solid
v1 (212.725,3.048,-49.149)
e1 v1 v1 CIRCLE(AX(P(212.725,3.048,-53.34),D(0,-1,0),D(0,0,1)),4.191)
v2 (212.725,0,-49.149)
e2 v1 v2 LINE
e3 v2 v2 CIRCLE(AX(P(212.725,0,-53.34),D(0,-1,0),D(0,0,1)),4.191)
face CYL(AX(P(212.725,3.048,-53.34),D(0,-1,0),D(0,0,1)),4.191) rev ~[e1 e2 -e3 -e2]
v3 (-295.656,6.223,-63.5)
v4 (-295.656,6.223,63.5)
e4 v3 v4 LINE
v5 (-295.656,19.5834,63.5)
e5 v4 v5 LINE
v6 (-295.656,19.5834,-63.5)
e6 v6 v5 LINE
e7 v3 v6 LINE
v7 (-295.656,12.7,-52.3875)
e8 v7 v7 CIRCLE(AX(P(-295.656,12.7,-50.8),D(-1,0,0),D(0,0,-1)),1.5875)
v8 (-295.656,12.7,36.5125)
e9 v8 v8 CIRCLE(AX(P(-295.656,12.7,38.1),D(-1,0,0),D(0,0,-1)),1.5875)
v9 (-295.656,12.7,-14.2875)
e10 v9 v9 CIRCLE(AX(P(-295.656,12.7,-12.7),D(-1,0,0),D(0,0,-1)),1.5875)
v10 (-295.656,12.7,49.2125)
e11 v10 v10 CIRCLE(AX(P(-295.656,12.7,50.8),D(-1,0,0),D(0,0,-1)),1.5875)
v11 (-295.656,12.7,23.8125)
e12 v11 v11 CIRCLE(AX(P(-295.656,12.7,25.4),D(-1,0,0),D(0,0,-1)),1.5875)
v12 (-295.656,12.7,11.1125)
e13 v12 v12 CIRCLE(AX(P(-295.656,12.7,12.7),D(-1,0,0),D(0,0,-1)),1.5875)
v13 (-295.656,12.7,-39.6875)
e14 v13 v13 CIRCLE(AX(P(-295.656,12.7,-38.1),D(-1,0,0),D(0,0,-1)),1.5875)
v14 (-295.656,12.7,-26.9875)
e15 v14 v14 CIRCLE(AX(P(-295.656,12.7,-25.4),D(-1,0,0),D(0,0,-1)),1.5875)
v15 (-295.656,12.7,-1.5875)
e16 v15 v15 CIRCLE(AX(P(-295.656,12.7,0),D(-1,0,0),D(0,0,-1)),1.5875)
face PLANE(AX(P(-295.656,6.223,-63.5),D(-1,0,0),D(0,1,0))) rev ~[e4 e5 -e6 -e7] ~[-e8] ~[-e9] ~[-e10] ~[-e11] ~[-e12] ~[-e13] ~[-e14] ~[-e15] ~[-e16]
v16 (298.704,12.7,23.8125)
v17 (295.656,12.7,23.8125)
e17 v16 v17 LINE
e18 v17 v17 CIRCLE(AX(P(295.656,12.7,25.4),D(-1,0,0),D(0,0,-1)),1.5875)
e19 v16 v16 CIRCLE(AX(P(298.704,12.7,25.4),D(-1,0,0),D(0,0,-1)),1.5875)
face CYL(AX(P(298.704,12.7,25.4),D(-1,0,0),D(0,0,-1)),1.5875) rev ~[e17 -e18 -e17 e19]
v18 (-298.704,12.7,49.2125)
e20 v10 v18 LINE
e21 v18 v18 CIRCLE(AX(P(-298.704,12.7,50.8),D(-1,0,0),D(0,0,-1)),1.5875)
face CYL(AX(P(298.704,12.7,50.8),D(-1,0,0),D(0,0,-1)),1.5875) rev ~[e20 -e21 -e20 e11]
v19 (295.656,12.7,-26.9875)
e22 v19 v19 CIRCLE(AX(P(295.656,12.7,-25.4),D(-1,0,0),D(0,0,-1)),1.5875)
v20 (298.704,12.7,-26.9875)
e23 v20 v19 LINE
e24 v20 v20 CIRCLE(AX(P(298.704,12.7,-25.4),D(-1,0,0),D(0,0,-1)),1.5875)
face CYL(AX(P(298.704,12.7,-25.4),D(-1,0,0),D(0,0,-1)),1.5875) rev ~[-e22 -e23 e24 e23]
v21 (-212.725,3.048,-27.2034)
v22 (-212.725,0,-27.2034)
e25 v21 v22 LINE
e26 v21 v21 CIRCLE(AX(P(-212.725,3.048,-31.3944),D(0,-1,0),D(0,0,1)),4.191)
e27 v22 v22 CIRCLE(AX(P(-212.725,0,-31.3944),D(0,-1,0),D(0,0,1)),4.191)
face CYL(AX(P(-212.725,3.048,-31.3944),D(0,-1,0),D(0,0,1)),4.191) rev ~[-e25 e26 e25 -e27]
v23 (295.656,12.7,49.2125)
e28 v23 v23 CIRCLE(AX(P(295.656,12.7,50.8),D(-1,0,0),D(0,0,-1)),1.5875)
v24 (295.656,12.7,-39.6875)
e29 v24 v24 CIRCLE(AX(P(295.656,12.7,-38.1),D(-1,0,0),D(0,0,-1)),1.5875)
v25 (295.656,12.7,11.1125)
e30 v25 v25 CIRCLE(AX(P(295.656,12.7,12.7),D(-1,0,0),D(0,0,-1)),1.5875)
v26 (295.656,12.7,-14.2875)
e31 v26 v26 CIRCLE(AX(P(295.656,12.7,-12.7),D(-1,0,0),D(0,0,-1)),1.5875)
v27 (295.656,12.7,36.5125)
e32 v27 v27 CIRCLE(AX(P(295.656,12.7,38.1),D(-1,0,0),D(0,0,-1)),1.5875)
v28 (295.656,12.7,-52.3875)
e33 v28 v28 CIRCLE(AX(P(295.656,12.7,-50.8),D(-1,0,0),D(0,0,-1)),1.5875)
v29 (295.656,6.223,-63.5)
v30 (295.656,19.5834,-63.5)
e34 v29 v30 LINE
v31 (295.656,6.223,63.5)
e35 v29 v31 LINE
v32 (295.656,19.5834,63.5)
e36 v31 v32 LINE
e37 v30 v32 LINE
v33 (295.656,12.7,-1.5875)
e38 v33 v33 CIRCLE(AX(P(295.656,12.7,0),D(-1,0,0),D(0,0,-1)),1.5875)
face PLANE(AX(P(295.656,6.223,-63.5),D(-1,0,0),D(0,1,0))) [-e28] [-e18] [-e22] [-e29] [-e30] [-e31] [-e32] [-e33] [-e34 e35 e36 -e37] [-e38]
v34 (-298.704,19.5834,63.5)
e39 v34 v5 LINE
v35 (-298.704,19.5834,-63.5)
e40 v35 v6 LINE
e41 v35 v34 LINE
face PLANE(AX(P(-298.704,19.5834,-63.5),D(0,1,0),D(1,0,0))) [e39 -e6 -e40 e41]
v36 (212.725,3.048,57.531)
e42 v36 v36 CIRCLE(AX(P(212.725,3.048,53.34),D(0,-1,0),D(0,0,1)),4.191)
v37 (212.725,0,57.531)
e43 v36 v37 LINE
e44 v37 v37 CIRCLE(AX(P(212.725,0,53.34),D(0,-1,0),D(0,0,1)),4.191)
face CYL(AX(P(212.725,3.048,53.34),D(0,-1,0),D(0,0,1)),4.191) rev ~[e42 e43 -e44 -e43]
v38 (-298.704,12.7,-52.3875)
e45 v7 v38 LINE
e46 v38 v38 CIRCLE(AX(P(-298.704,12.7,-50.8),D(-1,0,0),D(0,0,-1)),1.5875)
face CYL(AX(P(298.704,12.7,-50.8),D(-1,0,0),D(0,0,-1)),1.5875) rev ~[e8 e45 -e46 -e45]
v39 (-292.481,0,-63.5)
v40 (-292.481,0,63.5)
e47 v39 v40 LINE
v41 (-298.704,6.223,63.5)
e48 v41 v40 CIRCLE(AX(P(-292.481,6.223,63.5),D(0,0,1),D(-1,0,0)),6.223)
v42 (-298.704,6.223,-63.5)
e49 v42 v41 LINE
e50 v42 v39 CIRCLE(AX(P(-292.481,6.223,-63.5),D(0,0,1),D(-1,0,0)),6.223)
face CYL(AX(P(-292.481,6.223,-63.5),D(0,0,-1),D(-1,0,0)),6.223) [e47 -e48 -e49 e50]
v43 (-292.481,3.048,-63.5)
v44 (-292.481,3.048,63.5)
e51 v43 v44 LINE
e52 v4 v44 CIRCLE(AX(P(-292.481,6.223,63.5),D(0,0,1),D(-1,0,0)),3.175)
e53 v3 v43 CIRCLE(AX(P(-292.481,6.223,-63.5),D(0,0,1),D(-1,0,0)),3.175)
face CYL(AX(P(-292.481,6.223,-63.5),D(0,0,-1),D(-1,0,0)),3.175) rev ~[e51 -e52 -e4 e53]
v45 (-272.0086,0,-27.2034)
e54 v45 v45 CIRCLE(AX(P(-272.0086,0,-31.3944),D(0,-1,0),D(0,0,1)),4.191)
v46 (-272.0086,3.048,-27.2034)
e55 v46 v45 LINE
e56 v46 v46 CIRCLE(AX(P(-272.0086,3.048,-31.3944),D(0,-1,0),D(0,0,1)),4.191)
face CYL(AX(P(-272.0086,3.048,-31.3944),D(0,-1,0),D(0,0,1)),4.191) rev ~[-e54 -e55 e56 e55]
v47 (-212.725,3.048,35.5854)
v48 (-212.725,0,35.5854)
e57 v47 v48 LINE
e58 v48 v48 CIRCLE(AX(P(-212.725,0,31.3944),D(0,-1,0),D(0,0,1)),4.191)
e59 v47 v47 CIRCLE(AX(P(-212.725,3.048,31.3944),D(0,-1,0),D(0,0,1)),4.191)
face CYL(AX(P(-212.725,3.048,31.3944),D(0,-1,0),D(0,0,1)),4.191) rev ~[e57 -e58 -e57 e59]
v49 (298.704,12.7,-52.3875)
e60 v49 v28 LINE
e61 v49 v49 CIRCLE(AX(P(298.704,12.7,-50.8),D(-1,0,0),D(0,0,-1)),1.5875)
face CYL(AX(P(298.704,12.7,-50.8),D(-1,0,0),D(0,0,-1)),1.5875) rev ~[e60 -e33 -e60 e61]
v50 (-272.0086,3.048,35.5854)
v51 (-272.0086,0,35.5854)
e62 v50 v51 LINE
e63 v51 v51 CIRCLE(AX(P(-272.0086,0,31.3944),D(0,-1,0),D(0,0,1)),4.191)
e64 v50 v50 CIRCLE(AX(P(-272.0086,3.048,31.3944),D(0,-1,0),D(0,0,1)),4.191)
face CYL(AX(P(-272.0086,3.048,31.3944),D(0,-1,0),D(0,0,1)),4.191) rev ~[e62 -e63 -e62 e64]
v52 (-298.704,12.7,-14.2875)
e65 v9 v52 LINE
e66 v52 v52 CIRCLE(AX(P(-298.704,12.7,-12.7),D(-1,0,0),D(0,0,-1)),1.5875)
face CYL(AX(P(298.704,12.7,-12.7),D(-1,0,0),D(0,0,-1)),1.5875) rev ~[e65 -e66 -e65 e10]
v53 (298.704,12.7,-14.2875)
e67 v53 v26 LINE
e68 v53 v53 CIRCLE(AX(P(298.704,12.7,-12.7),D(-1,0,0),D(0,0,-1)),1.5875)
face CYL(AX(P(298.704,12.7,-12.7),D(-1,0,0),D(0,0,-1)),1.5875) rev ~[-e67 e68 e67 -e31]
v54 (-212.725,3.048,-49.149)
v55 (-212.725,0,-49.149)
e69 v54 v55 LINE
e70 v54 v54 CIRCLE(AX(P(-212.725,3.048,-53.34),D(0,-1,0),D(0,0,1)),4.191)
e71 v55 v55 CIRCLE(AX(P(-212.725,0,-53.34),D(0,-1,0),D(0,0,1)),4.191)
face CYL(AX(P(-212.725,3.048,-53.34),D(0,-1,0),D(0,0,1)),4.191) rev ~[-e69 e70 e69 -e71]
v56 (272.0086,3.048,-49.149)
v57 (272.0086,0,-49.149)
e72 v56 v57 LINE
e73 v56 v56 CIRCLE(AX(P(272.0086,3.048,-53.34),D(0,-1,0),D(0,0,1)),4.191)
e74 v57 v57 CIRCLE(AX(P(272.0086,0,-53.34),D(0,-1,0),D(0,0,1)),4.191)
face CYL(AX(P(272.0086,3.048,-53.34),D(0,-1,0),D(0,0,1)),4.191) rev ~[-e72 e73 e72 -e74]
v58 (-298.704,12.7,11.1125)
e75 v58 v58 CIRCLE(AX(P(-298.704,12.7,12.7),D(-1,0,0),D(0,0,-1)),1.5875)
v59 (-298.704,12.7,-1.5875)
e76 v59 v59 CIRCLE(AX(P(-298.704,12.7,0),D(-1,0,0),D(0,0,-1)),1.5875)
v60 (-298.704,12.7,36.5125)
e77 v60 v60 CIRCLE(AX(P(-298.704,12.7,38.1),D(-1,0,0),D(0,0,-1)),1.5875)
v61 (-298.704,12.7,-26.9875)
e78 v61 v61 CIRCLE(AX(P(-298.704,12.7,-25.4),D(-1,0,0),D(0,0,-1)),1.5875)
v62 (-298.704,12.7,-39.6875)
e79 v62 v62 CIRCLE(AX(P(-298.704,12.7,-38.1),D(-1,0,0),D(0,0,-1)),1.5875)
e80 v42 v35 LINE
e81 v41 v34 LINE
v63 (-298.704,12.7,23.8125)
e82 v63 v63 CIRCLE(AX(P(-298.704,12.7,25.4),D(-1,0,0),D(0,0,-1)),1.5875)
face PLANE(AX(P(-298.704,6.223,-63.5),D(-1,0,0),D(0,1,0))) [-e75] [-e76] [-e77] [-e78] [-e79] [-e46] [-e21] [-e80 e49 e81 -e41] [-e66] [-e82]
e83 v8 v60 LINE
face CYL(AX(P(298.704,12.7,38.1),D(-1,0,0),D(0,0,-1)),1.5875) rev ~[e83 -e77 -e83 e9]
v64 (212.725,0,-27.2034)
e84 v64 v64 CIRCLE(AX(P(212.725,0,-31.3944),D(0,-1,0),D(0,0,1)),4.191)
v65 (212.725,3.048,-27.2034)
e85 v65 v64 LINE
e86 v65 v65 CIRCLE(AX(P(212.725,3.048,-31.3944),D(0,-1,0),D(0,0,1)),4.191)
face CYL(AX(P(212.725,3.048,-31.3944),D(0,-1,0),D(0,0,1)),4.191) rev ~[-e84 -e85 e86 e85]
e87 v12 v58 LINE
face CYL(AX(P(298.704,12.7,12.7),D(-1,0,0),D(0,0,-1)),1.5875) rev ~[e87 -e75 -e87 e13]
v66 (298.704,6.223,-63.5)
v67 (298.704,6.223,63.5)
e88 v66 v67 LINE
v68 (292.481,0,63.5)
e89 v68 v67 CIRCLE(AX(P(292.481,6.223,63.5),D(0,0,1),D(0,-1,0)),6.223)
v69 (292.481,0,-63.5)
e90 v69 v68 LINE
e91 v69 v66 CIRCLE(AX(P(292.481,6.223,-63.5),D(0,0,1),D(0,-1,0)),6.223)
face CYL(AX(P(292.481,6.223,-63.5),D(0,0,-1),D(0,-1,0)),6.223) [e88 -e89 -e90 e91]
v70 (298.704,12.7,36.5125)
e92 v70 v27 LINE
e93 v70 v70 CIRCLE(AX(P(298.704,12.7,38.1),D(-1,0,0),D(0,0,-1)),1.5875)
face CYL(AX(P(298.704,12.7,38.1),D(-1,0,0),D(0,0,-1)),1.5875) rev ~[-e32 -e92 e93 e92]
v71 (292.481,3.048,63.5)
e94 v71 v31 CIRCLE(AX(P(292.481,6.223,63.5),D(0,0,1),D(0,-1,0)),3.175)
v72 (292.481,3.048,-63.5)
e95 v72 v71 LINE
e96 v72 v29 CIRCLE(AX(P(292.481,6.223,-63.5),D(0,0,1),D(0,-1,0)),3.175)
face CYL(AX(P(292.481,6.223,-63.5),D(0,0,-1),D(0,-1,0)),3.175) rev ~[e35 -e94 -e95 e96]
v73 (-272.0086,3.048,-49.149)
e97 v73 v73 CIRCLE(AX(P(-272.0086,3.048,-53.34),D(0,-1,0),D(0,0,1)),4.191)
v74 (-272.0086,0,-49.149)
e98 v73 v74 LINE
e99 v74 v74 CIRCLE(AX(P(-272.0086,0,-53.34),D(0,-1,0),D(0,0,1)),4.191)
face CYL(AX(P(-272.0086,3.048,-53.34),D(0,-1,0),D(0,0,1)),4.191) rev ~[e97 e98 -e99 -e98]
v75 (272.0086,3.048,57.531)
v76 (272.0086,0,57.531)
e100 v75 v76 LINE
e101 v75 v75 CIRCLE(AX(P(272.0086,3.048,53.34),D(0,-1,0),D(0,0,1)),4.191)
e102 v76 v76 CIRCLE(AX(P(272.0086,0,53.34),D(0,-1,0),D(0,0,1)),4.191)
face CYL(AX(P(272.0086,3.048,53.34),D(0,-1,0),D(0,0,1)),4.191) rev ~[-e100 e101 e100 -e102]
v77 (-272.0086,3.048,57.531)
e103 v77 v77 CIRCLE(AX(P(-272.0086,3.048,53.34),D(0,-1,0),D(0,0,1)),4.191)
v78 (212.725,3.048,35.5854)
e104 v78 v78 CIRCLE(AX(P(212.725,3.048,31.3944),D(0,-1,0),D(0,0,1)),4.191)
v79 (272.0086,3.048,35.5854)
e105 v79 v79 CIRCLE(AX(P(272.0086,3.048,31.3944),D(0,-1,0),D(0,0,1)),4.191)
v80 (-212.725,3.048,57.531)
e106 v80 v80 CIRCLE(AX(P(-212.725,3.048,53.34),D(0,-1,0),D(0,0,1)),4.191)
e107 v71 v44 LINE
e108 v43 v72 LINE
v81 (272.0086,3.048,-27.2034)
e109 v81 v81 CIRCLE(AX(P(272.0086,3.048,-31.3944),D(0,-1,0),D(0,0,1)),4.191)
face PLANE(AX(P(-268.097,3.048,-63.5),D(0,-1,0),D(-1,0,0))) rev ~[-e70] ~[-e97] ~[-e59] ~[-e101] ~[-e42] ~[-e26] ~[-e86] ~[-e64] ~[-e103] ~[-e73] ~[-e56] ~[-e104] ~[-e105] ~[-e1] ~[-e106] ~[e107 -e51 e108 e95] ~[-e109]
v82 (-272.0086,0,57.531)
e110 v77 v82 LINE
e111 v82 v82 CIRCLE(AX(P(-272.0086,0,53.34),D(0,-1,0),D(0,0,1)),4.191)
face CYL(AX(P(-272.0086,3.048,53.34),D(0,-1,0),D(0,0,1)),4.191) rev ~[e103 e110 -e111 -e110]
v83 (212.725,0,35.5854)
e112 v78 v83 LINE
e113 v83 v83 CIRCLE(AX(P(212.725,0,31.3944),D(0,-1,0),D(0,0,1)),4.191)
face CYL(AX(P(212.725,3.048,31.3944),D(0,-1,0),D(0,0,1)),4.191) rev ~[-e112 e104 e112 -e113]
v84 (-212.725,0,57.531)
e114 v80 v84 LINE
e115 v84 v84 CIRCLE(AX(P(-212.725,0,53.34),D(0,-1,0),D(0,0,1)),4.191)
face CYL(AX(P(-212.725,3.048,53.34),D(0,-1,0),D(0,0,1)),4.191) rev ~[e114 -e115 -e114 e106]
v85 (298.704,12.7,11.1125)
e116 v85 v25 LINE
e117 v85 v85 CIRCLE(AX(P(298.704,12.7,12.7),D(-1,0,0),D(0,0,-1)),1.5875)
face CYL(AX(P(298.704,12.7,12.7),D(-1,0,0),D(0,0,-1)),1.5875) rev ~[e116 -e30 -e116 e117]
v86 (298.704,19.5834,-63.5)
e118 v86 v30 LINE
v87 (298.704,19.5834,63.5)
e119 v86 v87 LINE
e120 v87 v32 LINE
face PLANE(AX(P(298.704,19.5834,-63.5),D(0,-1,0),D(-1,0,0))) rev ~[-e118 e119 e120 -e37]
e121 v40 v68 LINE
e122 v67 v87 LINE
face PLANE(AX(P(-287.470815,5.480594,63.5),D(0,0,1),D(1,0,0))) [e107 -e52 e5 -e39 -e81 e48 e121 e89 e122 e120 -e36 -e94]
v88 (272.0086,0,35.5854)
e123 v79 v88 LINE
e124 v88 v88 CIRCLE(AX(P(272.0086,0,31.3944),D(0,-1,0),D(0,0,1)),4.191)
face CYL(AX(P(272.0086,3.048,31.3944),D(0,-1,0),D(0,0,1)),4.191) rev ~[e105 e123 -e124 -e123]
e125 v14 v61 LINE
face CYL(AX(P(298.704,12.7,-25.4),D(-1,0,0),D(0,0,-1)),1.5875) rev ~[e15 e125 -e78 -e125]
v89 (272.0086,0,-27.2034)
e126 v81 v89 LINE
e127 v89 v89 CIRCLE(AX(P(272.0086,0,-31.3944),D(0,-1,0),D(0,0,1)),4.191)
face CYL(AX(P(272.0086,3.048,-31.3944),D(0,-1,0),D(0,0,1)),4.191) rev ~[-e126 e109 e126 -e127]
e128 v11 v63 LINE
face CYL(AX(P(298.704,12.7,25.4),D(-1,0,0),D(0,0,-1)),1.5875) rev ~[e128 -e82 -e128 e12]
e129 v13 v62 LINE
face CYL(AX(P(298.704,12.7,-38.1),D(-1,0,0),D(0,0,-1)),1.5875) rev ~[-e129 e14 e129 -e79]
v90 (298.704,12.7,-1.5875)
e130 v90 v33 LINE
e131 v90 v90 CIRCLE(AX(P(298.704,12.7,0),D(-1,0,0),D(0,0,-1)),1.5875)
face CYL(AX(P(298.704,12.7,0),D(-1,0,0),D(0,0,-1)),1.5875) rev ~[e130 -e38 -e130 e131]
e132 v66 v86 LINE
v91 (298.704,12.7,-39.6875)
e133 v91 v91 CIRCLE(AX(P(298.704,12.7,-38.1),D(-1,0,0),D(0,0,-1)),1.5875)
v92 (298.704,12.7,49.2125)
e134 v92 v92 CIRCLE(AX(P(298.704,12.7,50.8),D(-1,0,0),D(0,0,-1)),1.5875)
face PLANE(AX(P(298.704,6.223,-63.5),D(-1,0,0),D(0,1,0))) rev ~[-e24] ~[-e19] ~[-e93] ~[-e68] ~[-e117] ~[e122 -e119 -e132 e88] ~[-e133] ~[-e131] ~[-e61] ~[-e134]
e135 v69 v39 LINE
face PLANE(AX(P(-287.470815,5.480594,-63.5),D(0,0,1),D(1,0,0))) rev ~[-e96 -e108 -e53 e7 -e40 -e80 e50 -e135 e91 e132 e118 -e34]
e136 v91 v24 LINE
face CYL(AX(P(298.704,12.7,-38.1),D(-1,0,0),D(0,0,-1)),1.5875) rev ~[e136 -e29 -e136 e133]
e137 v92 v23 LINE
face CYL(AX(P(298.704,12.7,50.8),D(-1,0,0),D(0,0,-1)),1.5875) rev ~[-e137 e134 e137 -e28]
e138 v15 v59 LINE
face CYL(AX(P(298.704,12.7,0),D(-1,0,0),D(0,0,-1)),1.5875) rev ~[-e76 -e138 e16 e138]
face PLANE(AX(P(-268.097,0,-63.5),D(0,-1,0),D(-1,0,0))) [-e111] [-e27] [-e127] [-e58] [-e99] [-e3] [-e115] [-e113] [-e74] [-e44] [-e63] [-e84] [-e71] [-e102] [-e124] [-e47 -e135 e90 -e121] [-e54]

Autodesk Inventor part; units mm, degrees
ref_plane "YZ Plane" through (0, 0, 0) normal (1, 0, 0) x (0, 1, 0)
ref_plane "XZ Plane" through (0, 0, 0) normal (0, 1, 0) x (-1, 0, 0)
ref_plane "XY Plane" through (0, 0, 0) normal (0, 0, 1) x (1, 0, 0)
sketch "Sketch2" plane through (0, 0, 0) normal (0, 1, 0) x (-1, 0, 0)
  line L0 (-292.481, 63.5) -> (292.481, 63.5)
  line L1 (292.481, 63.5) -> (292.481, -63.5)
  line L2 (292.481, -63.5) -> (-292.481, -63.5)
  line L3 (-292.481, -63.5) -> (-292.481, 63.5)
  point P0 (0, 0)
  dimension "d0" = 292.481
  dimension "d1" = 292.481
  dimension "d2" = 63.5
  dimension "d3" = 63.5
extrude "Plate1" add sketch "Sketch2" along normal blind 3.048
sketch "Sketch3" plane through (-292.481, 0, 63.5) normal (0, 0, 1) x (1, 0, 0)
  arc A0 (584.962, 0) -> (591.185, 6.223) centre (584.962, 6.223) ccw
  line L0 (584.962, 6.223) -> (591.185, 6.223) construction
  line L1 (584.962, 6.223) -> (584.962, 0) construction
  line L2 (591.185, 6.223) -> (591.185, 19.5834)
  point P0 (584.962, 3.048)
  point P1 (292.481, 0)
  dimension "d5" = 90
  dimension "d6" = 6.223
  dimension "d7" = 6.223
  dimension "d8" = 13.3604
contour flange "Contour Flange1" sketch "Sketch3" thickness 3.048 bend radius 3.048 curves A0 L2 edges at (292.481, 0, 0) running between points at (292.481, 0, -63.5) (292.481, 0, 63.5)
bend "Bend1"
corner "Corner1"
sketch "Sketch4" plane through (-292.481, 0, 63.5) normal (0, 0, 1) x (1, 0, 0)
  arc A0 (-6.223, 6.223) -> (0, 0) centre (0, 6.223) ccw
  line L0 (0, 6.223) -> (-6.223, 6.223) construction
  line L1 (0, 6.223) -> (0, 0) construction
  line L2 (-6.223, 6.223) -> (-6.223, 19.5834)
  point P0 (0, 3.048)
  point P1 (292.481, 0)
  dimension "d18" = 90
  dimension "d19" = 6.223
  dimension "d20" = 6.223
  dimension "d21" = 13.3604
contour flange "Contour Flange2" sketch "Sketch4" thickness 3.048 bend radius 3.048 curves A0 L2 edges at (-292.481, 0, 0) running between points at (-292.481, 0, 63.5) (-292.481, 0, -63.5)
bend "Bend2"
corner "Corner2"
sketch "Sketch5" plane through (298.704, 6.223, -63.5) normal (1, 0, 0) x (0, 0, -1)
  line L0 (-127, 0) -> (-127, 13.3604) projected
  line L1 (0, -6.223) -> (-127, -6.223) projected
  point P0 (-63.5, -6.223)
  point P1 (-114.3, 6.477)
  dimension "d31" = 12.7
  dimension "d32" = 12.7
hole "Hole1" at (298.704, 12.7, 50.8) direction (-1, 0, 0) diameter 3.175 end through all
sketch "Sketch6" plane through (298.704, 6.223, -63.5) normal (1, 0, 0) x (0, 0, -1)
  circle A0 centre (-114.3, 6.477) radius 1.5875 projected
  line L0 (-127, 0) -> (-127, 13.3604) projected
  line L1 (-114.3, 6.477) -> (-99.9256, 6.477)
  point P0 (-63.5, -6.223)
pattern_linear "Rectangular Pattern1" count 9 spacing 12.7 along (0, 0, -1) of "Hole1"
sketch "Sketch7" plane through (0, 3.048, 0) normal (0, 1, 0) x (1, 0, 0)
  line L0 (292.481, -63.5) -> (-292.481, -63.5) projected
  line L1 (-292.481, 63.5) -> (292.481, 63.5) projected
  line L2 (298.704, 63.5) -> (298.704, -63.5) projected
  line L3 (-298.704, -63.5) -> (-298.704, 63.5) projected
  point P0 (0, 0)
  point P1 (272.0086, -53.34)
  point P2 (272.0086, 53.34)
  point P3 (-272.0086, -53.34)
  point P4 (-272.0086, 53.34)
  point P5 (-272.0086, 31.3944)
  point P6 (-272.0086, -31.3944)
  point P7 (272.0086, -31.3944)
  point P8 (272.0086, 31.3944)
  point P9 (-212.725, -53.34)
  point P10 (-212.725, -31.3944)
  point P11 (-212.725, 31.3944)
  point P12 (-212.725, 53.34)
  point P13 (212.725, -53.34)
  point P14 (212.725, -31.3944)
  point P15 (212.725, 31.3944)
  point P16 (212.725, 53.34)
  dimension "d43" = 26.6954
  dimension "d44" = 10.16
  dimension "d45" = 10.16
  dimension "d46" = 26.6954
  dimension "d54" = 84.7344
  dimension "d55" = 84.7344
  dimension "d56" = 59.2836
  dimension "d57" = 59.2836
hole "Hole3" at (272.0086, 3.048, 53.34) at (272.0086, 3.048, -53.34) at (-272.0086, 3.048, 53.34) at (-272.0086, 3.048, -53.34) at (-272.0086, 3.048, -31.3944) at (-272.0086, 3.048, 31.3944) at (272.0086, 3.048, 31.3944) at (272.0086, 3.048, -31.3944) at (-212.725, 3.048, 53.34) at (-212.725, 3.048, 31.3944) at (-212.725, 3.048, -31.3944) at (-212.725, 3.048, -53.34) at (212.725, 3.048, 53.34) at (212.725, 3.048, 31.3944) at (212.725, 3.048, -31.3944) at (212.725, 3.048, -53.34) direction (0, -1, 0) diameter 8.382 end through all
equation "\"d38\" = Thickness"
equation "\"d63\" = Thickness"
equation "\"d9\" = BendReliefWidth"
equation "\"d10\" = BendReliefDepth"
equation "\"d11\" = MinimumRemnant"
equation "\"d12\" = BendRadius"
equation "\"d13\" = BendRadius"
equation "\"d15\" = CornerReliefSize"
equation "\"d16\" = GapSize"
equation "\"d17\" = JacobiRadiusSize"
equation "\"d22\" = BendReliefWidth"
equation "\"d23\" = BendReliefDepth"
equation "\"d24\" = MinimumRemnant"
equation "\"d25\" = BendRadius"
equation "\"d26\" = BendRadius"
equation "\"d28\" = CornerReliefSize"
equation "\"d29\" = GapSize"
equation "\"d30\" = JacobiRadiusSize"
equation "\"d1\" = d0"
equation "\"d3\" = d2"
equation "\"BendRadius\" = Thickness"
equation "\"BendReliefWidth\" = Thickness"
equation "\"BendReliefDepth\" = 0.5 * Thickness"
equation "\"CornerReliefSize\" = 4 * Thickness"
equation "\"MinimumRemnant\" = 2 * Thickness"
equation "\"TransitionRadius\" = BendRadius"
equation "\"JacobiRadiusSize\" = BendRadius"
equation "\"GapSize\" = Thickness"
equation "\"d4\" = BendRadius"
equation "\"Thickness\" = 3.048"
properties part number "Base Crossbar"
